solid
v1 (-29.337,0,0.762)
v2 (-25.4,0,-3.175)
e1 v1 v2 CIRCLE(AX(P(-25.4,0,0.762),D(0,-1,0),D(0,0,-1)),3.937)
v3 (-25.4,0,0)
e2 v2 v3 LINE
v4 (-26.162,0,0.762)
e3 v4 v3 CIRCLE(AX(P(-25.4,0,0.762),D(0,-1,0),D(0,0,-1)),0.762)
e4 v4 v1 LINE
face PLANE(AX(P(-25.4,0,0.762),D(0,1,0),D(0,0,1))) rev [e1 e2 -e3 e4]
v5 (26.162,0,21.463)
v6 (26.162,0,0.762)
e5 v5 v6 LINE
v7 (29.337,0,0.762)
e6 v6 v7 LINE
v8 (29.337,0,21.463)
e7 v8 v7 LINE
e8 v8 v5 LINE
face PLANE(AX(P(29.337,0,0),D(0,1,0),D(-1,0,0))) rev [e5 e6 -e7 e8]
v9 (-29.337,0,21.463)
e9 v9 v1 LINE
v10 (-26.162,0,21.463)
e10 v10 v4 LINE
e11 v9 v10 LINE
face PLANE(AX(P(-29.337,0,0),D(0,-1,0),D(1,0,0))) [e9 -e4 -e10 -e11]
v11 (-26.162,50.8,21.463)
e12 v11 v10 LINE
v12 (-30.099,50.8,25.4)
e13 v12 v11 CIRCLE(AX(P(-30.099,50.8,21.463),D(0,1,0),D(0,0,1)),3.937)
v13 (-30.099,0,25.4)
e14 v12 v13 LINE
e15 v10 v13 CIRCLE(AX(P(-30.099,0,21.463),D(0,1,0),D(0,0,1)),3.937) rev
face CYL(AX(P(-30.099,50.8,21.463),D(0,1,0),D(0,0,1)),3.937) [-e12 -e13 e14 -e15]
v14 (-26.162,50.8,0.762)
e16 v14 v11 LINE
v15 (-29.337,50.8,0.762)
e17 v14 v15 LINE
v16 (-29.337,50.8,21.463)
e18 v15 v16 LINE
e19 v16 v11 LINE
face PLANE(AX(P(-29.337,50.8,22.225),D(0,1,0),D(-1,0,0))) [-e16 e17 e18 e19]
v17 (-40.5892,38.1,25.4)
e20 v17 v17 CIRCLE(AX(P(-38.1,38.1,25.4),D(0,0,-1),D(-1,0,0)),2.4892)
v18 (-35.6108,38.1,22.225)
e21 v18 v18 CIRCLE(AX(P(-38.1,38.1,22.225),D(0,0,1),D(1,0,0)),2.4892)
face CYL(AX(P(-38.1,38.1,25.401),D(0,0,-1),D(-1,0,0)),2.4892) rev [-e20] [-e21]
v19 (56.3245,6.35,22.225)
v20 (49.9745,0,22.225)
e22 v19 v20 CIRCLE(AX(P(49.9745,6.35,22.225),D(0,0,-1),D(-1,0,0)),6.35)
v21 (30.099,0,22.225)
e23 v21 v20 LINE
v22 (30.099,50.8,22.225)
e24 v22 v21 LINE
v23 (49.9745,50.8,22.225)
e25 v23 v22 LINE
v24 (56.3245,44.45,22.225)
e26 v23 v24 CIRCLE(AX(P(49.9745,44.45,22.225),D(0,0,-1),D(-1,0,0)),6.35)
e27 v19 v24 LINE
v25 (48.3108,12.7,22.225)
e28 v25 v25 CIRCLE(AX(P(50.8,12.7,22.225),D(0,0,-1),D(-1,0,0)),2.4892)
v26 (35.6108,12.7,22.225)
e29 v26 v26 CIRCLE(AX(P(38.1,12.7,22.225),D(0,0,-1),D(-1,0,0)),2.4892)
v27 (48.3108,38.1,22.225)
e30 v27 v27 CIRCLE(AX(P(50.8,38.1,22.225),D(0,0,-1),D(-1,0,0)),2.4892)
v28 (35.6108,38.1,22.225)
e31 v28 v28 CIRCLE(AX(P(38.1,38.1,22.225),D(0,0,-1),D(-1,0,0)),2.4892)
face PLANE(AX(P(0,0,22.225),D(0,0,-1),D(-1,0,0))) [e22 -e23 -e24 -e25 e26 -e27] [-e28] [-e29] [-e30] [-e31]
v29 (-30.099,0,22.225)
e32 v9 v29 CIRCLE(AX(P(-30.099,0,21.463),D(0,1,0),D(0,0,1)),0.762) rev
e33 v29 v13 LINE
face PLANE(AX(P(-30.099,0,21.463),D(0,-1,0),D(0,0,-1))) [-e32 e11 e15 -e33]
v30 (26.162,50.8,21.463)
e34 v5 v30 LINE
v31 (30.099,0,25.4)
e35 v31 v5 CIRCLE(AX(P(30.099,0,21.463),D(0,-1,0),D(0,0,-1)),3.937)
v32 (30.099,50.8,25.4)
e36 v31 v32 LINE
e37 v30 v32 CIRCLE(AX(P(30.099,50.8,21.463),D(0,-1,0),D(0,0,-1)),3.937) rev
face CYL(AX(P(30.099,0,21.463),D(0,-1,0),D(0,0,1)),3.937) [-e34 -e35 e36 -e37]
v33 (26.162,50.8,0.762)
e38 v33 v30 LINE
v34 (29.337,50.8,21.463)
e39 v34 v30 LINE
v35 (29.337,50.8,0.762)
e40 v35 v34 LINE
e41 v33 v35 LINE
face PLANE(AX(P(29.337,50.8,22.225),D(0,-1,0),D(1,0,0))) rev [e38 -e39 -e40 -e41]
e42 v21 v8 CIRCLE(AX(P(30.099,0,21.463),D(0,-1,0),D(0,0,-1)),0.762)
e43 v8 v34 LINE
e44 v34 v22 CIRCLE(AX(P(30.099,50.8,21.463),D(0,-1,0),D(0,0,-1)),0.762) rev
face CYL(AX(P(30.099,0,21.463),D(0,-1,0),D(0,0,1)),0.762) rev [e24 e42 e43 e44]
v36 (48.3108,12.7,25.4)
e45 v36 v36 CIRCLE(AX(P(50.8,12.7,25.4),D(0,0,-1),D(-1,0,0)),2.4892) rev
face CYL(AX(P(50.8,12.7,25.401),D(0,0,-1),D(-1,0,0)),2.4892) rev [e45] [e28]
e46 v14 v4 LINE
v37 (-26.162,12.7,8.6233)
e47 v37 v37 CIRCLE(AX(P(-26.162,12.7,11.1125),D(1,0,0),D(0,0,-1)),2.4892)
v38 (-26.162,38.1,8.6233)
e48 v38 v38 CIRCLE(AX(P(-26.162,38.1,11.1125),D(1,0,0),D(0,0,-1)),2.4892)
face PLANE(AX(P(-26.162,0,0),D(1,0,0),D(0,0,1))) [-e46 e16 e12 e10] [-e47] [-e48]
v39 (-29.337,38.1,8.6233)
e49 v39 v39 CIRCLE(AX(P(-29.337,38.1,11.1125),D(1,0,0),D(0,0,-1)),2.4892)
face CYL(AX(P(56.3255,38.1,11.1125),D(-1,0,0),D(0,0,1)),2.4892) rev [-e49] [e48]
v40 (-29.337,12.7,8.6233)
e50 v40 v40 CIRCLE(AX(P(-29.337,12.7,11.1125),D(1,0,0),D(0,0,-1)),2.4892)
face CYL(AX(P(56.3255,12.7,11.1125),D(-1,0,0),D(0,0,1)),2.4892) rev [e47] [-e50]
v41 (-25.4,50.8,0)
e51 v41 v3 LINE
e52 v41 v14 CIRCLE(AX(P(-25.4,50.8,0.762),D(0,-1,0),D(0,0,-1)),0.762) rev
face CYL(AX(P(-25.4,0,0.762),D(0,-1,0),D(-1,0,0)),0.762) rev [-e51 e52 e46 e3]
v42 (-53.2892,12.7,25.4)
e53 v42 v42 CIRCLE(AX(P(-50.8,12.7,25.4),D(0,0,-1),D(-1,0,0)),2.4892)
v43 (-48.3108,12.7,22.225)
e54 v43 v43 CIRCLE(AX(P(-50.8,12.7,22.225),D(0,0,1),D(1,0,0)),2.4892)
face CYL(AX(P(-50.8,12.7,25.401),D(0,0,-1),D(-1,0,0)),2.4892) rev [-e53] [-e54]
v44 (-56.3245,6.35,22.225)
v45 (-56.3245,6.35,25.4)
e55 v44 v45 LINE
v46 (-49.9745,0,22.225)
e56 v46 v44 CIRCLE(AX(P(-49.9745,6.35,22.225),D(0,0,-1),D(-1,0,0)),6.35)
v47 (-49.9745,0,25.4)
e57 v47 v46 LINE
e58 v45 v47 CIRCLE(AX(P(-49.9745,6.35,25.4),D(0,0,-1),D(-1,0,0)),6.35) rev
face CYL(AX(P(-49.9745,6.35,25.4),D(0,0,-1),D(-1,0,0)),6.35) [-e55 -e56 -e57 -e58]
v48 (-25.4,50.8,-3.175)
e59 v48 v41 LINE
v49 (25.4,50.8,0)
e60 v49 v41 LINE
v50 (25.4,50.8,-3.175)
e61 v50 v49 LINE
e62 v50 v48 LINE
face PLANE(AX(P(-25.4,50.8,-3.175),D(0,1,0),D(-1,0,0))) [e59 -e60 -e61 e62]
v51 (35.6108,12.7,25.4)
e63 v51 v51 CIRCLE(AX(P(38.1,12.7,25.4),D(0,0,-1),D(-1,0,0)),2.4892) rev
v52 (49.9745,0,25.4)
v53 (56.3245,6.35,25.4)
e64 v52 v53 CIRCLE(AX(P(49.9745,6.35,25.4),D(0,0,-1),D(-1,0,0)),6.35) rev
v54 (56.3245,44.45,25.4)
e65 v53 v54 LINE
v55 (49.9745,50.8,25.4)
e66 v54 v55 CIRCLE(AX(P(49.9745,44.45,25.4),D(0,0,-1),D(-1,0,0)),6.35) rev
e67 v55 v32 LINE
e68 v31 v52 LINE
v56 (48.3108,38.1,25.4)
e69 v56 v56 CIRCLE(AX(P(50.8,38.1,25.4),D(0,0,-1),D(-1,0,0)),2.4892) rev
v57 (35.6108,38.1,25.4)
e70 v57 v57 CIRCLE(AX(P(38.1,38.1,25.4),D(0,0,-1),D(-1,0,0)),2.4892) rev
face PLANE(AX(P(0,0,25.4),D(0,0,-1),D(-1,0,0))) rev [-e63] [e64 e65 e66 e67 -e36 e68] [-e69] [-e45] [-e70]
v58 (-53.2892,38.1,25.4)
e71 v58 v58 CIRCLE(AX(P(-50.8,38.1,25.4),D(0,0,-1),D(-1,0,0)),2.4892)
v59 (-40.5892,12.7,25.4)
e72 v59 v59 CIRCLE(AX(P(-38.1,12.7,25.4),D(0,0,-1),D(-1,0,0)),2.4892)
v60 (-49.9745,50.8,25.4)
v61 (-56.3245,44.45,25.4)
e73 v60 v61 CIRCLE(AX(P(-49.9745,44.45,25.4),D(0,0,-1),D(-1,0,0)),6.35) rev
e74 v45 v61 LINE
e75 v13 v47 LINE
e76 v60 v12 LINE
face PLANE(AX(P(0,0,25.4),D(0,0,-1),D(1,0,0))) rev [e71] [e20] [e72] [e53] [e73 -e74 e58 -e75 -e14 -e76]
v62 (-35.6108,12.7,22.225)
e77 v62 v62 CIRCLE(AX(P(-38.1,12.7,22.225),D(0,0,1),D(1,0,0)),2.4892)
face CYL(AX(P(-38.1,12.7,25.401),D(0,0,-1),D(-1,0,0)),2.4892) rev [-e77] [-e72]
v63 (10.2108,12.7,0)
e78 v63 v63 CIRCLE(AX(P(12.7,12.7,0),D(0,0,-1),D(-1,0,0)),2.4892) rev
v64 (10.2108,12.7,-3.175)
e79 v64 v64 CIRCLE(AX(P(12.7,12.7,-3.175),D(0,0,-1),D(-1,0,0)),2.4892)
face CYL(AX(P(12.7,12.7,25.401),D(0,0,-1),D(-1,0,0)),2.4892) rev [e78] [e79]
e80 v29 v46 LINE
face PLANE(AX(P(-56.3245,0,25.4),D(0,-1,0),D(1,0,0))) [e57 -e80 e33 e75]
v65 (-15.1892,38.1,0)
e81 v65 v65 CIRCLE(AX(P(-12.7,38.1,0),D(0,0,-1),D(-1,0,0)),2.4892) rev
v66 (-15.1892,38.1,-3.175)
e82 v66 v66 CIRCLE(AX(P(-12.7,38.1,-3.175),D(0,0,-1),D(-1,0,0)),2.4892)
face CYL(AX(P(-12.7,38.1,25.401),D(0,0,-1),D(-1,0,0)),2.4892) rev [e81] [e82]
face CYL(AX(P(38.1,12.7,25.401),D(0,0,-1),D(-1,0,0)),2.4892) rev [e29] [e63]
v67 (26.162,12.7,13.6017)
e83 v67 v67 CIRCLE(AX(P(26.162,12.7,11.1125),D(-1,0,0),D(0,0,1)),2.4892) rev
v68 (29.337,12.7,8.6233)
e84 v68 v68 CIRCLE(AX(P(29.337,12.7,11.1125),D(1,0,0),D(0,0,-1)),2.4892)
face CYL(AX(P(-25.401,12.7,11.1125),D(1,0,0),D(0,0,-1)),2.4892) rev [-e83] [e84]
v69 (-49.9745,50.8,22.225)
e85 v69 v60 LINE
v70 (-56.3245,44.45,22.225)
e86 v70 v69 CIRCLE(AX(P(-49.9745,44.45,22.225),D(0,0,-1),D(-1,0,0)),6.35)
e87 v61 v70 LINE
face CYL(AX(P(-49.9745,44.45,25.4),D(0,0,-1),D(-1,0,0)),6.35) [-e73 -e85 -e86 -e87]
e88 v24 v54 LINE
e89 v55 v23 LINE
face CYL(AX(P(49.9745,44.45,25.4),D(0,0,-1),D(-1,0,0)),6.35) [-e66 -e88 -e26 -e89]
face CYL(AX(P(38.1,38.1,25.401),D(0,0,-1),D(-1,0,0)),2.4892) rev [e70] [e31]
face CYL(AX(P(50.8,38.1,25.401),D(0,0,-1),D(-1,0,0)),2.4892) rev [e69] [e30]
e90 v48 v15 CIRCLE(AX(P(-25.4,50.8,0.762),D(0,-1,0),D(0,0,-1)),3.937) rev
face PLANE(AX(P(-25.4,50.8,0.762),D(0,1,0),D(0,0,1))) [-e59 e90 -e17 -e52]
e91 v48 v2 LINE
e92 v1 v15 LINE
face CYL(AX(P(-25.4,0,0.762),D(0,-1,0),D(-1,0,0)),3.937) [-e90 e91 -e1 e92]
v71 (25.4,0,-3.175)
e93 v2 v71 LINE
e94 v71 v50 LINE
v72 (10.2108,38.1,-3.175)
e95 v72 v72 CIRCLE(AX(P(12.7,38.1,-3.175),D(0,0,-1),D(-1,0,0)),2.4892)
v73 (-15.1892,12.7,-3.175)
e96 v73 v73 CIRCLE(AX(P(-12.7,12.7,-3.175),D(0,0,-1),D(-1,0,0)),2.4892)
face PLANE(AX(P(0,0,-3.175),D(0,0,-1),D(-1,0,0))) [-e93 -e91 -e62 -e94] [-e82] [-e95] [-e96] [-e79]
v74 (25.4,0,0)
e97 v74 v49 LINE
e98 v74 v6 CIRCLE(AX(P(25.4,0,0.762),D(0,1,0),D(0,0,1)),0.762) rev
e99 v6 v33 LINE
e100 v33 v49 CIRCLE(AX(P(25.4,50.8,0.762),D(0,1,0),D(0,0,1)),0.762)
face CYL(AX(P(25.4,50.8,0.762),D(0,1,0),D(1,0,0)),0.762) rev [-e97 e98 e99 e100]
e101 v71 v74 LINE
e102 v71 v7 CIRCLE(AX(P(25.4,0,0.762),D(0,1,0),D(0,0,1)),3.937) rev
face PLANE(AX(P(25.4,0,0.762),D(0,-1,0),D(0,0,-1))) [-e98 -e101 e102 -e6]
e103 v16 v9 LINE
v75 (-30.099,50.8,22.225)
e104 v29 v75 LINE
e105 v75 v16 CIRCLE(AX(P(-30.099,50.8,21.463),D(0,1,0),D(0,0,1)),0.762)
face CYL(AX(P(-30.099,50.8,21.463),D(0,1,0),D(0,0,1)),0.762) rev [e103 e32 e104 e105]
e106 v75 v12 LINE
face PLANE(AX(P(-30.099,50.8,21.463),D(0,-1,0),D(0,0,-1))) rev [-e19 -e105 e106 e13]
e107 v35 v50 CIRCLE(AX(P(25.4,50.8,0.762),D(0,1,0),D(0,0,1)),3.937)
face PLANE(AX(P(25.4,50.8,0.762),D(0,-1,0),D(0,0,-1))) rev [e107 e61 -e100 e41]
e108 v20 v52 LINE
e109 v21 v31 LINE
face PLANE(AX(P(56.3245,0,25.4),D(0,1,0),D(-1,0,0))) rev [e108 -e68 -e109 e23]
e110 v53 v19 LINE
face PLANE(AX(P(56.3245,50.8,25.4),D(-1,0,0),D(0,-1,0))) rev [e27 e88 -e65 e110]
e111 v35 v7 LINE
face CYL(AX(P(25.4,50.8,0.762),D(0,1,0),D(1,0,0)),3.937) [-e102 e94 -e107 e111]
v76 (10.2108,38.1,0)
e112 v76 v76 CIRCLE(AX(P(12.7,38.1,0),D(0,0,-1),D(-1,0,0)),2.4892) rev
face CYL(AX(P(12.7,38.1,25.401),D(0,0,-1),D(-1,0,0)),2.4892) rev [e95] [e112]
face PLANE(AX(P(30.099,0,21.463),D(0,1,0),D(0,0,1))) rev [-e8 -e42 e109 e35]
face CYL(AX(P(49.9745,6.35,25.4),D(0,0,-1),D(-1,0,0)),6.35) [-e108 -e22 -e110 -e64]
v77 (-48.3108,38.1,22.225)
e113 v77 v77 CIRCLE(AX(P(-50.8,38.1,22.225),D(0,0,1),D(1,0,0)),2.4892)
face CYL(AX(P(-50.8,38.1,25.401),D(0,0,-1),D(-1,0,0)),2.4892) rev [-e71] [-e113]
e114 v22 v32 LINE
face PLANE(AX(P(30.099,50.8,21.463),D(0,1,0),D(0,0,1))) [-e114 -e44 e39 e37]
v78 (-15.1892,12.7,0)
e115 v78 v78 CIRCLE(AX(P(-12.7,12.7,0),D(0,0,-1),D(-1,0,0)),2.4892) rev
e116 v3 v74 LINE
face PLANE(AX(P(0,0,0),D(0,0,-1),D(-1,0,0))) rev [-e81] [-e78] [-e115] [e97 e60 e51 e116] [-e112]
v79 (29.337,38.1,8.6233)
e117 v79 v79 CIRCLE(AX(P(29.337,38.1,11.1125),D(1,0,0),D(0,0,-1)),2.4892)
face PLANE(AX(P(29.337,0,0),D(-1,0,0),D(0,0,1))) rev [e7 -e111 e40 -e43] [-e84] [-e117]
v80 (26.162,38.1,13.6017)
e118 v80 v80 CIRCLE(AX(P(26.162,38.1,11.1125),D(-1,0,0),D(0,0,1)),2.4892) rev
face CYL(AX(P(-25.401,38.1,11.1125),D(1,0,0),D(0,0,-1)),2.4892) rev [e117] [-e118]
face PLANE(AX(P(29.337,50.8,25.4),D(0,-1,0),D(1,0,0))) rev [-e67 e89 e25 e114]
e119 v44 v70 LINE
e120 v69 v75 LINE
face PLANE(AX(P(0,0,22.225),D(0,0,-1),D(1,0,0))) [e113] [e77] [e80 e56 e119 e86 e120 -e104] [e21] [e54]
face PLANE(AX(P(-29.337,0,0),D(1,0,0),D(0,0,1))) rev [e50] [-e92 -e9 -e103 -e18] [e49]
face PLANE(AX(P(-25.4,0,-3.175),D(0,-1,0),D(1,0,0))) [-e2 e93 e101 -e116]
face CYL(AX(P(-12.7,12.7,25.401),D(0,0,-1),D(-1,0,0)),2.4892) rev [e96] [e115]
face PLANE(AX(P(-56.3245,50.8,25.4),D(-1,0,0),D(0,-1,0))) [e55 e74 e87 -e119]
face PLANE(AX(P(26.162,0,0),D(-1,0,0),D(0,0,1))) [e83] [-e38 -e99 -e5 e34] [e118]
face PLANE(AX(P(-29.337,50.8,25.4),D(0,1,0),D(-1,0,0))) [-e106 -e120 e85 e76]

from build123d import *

# Parameters (mm, degrees)
SKETCH1_W                    = 50.8
SKETCH1_H                    = 50.8
BASE_FLANGE1_DEPTH           = 3.175
EDGE_FLANGE1_DEPTH           = 50.8
EDGE_FLANGE2_STRIP_W         = 14.224
EDGE_FLANGE2_STRIP_H         = 3.175
EDGE_FLANGE2_STRIP_CUT_DEPTH = 50.8
EDGE_FLANGE2_DEPTH           = 50.8
CUT_EXTRUDE1_REACH           = 80.879
SKETCH16_R                   = 2.4892
CUT_EXTRUDE2_REACH           = 81.989
SKETCH17_R                   = 2.4892
CUT_EXTRUDE3_REACH           = 83.053
SKETCH18_R                   = 2.4892
FILLET1_R                    = 6.35
FILLET1_OF_MIRROR1_R         = 6.35


# Sheet-metal steps are written as plain solids
with BuildPart() as part:
    # Sketch1 → Base-Flange1 (new body)
    with BuildSketch(Plane.XY):
        with Locations((0, 25.4)):
            Rectangle(SKETCH1_W, SKETCH1_H)
    extrude(amount=-BASE_FLANGE1_DEPTH)

    # Edge-Flange1 section (across the edge) → Edge-Flange1 (add)
    with BuildSketch(Plane(origin=(26.162, 0, 0), x_dir=(-1, 0, 0), z_dir=(0, 1, 0))):
        with BuildLine():
            Line((-3.175, 0.762), (-3.175, 22.225))
            Line((-3.175, 22.225), (0, 22.225))
            Line((0, 22.225), (0, 0.762))
            ThreePointArc((0, 0.762), (0.223184633, 0.223184633), (0.762, 0))
            Line((0.762, 0), (0.762, -3.175))
            ThreePointArc((0.762, -3.175), (-2.021879398, -2.021879398), (-3.175, 0.762))
        make_face()
    edge_flange1 = extrude(amount=EDGE_FLANGE1_DEPTH)

    # Edge-Flange2 strip (across the edge) → Edge-Flange2 strip cut (cut)
    with BuildSketch(Plane(origin=(29.337, 50.8, 22.225), x_dir=(0, 0, -1), z_dir=(0, -1, 0))):
        with Locations((-6.35, -1.5875)):
            Rectangle(EDGE_FLANGE2_STRIP_W, EDGE_FLANGE2_STRIP_H)
    edge_flange2_strip_cut = extrude(amount=EDGE_FLANGE2_STRIP_CUT_DEPTH, mode=Mode.SUBTRACT)

    # Edge-Flange2 section (across the edge) → Edge-Flange2 (add)
    with BuildSketch(Plane(origin=(29.337, 50.8, 22.225), x_dir=(0, 0, -1), z_dir=(0, -1, 0))):
        with BuildLine():
            Line((-3.175, 0.762), (-3.175, 26.9875))
            Line((-3.175, 26.9875), (0, 26.9875))
            Line((0, 26.9875), (0, 0.762))
            ThreePointArc((0, 0.762), (0.223184633, 0.223184633), (0.762, 0))
            Line((0.762, 0), (0.762, -3.175))
            ThreePointArc((0.762, -3.175), (-2.021879398, -2.021879398), (-3.175, 0.762))
        make_face()
    edge_flange2 = extrude(amount=EDGE_FLANGE2_DEPTH)

    # Sketch16 → Cut-Extrude1 (cut, up to next)
    with BuildSketch(Plane(origin=(29.337, 0, 0), x_dir=(0, 0, -1), z_dir=(1, 0, 0)), mode=Mode.PRIVATE) as cut_extrude1_sk1:
        with Locations((-11.1125, 38.1)):
            Circle(SKETCH16_R)
    cut_extrude1_tool1 = extrude(cut_extrude1_sk1.sketch, amount=-CUT_EXTRUDE1_REACH, mode=Mode.PRIVATE) & part.part
    # Sketch16 → Cut-Extrude1 (cut, up to next)
    with BuildSketch(Plane(origin=(29.337, 0, 0), x_dir=(0, 0, -1), z_dir=(1, 0, 0)), mode=Mode.PRIVATE) as cut_extrude1_sk2:
        with Locations((-11.1125, 12.7)):
            Circle(SKETCH16_R)
    cut_extrude1_tool2 = extrude(cut_extrude1_sk2.sketch, amount=-CUT_EXTRUDE1_REACH, mode=Mode.PRIVATE) & part.part
    cut_extrude1_1 = cut_extrude1_tool1.solids().sort_by_distance((29.337, 38.1, 11.1125))[0]
    add(cut_extrude1_1, mode=Mode.SUBTRACT)
    cut_extrude1_2 = cut_extrude1_tool2.solids().sort_by_distance((29.337, 12.7, 11.1125))[0]
    add(cut_extrude1_2, mode=Mode.SUBTRACT)
    cut_extrude1 = cut_extrude1_1 + cut_extrude1_2  # Cut-Extrude1 as one shape, for the pattern or mirror that repeats it

    # Sketch17 → Cut-Extrude2 (cut, up to next)
    with BuildSketch(Plane(origin=(0, 0, 22.225), x_dir=(-1, 0, 0), z_dir=(0, 0, -1)), mode=Mode.PRIVATE) as cut_extrude2_sk1:
        with Locations((-50.8, 38.1)):
            Circle(SKETCH17_R)
    cut_extrude2_tool1 = extrude(cut_extrude2_sk1.sketch, amount=-CUT_EXTRUDE2_REACH, mode=Mode.PRIVATE) & part.part
    # Sketch17 → Cut-Extrude2 (cut, up to next)
    with BuildSketch(Plane(origin=(0, 0, 22.225), x_dir=(-1, 0, 0), z_dir=(0, 0, -1)), mode=Mode.PRIVATE) as cut_extrude2_sk2:
        with Locations((-38.1, 38.1)):
            Circle(SKETCH17_R)
    cut_extrude2_tool2 = extrude(cut_extrude2_sk2.sketch, amount=-CUT_EXTRUDE2_REACH, mode=Mode.PRIVATE) & part.part
    # Sketch17 → Cut-Extrude2 (cut, up to next)
    with BuildSketch(Plane(origin=(0, 0, 22.225), x_dir=(-1, 0, 0), z_dir=(0, 0, -1)), mode=Mode.PRIVATE) as cut_extrude2_sk3:
        with Locations((-38.1, 12.7)):
            Circle(SKETCH17_R)
    cut_extrude2_tool3 = extrude(cut_extrude2_sk3.sketch, amount=-CUT_EXTRUDE2_REACH, mode=Mode.PRIVATE) & part.part
    # Sketch17 → Cut-Extrude2 (cut, up to next)
    with BuildSketch(Plane(origin=(0, 0, 22.225), x_dir=(-1, 0, 0), z_dir=(0, 0, -1)), mode=Mode.PRIVATE) as cut_extrude2_sk4:
        with Locations((-50.8, 12.7)):
            Circle(SKETCH17_R)
    cut_extrude2_tool4 = extrude(cut_extrude2_sk4.sketch, amount=-CUT_EXTRUDE2_REACH, mode=Mode.PRIVATE) & part.part
    cut_extrude2_1 = cut_extrude2_tool1.solids().sort_by_distance((50.8, 38.1, 22.225))[0]
    add(cut_extrude2_1, mode=Mode.SUBTRACT)
    cut_extrude2_2 = cut_extrude2_tool2.solids().sort_by_distance((38.1, 38.1, 22.225))[0]
    add(cut_extrude2_2, mode=Mode.SUBTRACT)
    cut_extrude2_3 = cut_extrude2_tool3.solids().sort_by_distance((38.1, 12.7, 22.225))[0]
    add(cut_extrude2_3, mode=Mode.SUBTRACT)
    cut_extrude2_4 = cut_extrude2_tool4.solids().sort_by_distance((50.8, 12.7, 22.225))[0]
    add(cut_extrude2_4, mode=Mode.SUBTRACT)
    cut_extrude2 = cut_extrude2_1 + cut_extrude2_2 + cut_extrude2_3 + cut_extrude2_4  # Cut-Extrude2 as one shape, for the pattern or mirror that repeats it

    # Sketch18 → Cut-Extrude3 (cut, up to next)
    with BuildSketch(Plane(origin=(0, 0, -3.175), x_dir=(-1, 0, 0), z_dir=(0, 0, -1)), mode=Mode.PRIVATE) as cut_extrude3_sk1:
        with Locations((-12.7, 38.1)):
            Circle(SKETCH18_R)
    cut_extrude3_tool1 = extrude(cut_extrude3_sk1.sketch, amount=-CUT_EXTRUDE3_REACH, mode=Mode.PRIVATE) & part.part
    # Sketch18 → Cut-Extrude3 (cut, up to next)
    with BuildSketch(Plane(origin=(0, 0, -3.175), x_dir=(-1, 0, 0), z_dir=(0, 0, -1)), mode=Mode.PRIVATE) as cut_extrude3_sk2:
        with Locations((12.7, 38.1)):
            Circle(SKETCH18_R)
    cut_extrude3_tool2 = extrude(cut_extrude3_sk2.sketch, amount=-CUT_EXTRUDE3_REACH, mode=Mode.PRIVATE) & part.part
    # Sketch18 → Cut-Extrude3 (cut, up to next)
    with BuildSketch(Plane(origin=(0, 0, -3.175), x_dir=(-1, 0, 0), z_dir=(0, 0, -1)), mode=Mode.PRIVATE) as cut_extrude3_sk3:
        with Locations((12.7, 12.7)):
            Circle(SKETCH18_R)
    cut_extrude3_tool3 = extrude(cut_extrude3_sk3.sketch, amount=-CUT_EXTRUDE3_REACH, mode=Mode.PRIVATE) & part.part
    # Sketch18 → Cut-Extrude3 (cut, up to next)
    with BuildSketch(Plane(origin=(0, 0, -3.175), x_dir=(-1, 0, 0), z_dir=(0, 0, -1)), mode=Mode.PRIVATE) as cut_extrude3_sk4:
        with Locations((-12.7, 12.7)):
            Circle(SKETCH18_R)
    cut_extrude3_tool4 = extrude(cut_extrude3_sk4.sketch, amount=-CUT_EXTRUDE3_REACH, mode=Mode.PRIVATE) & part.part
    add(cut_extrude3_tool1.solids().sort_by_distance((12.7, 38.1, -3.175))[0], mode=Mode.SUBTRACT)
    add(cut_extrude3_tool2.solids().sort_by_distance((-12.7, 38.1, -3.175))[0], mode=Mode.SUBTRACT)
    add(cut_extrude3_tool3.solids().sort_by_distance((-12.7, 12.7, -3.175))[0], mode=Mode.SUBTRACT)
    add(cut_extrude3_tool4.solids().sort_by_distance((12.7, 12.7, -3.175))[0], mode=Mode.SUBTRACT)

    # Fillet1
    fillet1_edges = [part.edges().sort_by_distance(p)[0] for p in [
        (56.3245, 50.8, 23.8125),
        (56.3245, 0, 23.8125),
    ]]
    fillet(fillet1_edges, radius=FILLET1_R)

    # Mirror1: Edge-Flange1, Edge-Flange2 strip cut, Edge-Flange2, Cut-Extrude1, Cut-Extrude2 across plane
    add(edge_flange1.mirror(Plane(origin=(0, 0, 0), x_dir=(0, 0, 1), z_dir=(1, 0, 0))))
    add(edge_flange2_strip_cut.mirror(Plane(origin=(0, 0, 0), x_dir=(0, 0, 1), z_dir=(1, 0, 0))), mode=Mode.SUBTRACT)
    add(edge_flange2.mirror(Plane(origin=(0, 0, 0), x_dir=(0, 0, 1), z_dir=(1, 0, 0))))
    add(cut_extrude1.mirror(Plane(origin=(0, 0, 0), x_dir=(0, 0, 1), z_dir=(1, 0, 0))), mode=Mode.SUBTRACT)
    add(cut_extrude2.mirror(Plane(origin=(0, 0, 0), x_dir=(0, 0, 1), z_dir=(1, 0, 0))), mode=Mode.SUBTRACT)

    # Fillet1 of Mirror1
    fillet1_of_mirror1_edges = [part.edges().sort_by_distance(p)[0] for p in [
        (-56.3245, 50.8, 23.8125),
        (-56.3245, 0, 23.8125),
    ]]
    fillet(fillet1_of_mirror1_edges, radius=FILLET1_OF_MIRROR1_R)


solid = part.part
